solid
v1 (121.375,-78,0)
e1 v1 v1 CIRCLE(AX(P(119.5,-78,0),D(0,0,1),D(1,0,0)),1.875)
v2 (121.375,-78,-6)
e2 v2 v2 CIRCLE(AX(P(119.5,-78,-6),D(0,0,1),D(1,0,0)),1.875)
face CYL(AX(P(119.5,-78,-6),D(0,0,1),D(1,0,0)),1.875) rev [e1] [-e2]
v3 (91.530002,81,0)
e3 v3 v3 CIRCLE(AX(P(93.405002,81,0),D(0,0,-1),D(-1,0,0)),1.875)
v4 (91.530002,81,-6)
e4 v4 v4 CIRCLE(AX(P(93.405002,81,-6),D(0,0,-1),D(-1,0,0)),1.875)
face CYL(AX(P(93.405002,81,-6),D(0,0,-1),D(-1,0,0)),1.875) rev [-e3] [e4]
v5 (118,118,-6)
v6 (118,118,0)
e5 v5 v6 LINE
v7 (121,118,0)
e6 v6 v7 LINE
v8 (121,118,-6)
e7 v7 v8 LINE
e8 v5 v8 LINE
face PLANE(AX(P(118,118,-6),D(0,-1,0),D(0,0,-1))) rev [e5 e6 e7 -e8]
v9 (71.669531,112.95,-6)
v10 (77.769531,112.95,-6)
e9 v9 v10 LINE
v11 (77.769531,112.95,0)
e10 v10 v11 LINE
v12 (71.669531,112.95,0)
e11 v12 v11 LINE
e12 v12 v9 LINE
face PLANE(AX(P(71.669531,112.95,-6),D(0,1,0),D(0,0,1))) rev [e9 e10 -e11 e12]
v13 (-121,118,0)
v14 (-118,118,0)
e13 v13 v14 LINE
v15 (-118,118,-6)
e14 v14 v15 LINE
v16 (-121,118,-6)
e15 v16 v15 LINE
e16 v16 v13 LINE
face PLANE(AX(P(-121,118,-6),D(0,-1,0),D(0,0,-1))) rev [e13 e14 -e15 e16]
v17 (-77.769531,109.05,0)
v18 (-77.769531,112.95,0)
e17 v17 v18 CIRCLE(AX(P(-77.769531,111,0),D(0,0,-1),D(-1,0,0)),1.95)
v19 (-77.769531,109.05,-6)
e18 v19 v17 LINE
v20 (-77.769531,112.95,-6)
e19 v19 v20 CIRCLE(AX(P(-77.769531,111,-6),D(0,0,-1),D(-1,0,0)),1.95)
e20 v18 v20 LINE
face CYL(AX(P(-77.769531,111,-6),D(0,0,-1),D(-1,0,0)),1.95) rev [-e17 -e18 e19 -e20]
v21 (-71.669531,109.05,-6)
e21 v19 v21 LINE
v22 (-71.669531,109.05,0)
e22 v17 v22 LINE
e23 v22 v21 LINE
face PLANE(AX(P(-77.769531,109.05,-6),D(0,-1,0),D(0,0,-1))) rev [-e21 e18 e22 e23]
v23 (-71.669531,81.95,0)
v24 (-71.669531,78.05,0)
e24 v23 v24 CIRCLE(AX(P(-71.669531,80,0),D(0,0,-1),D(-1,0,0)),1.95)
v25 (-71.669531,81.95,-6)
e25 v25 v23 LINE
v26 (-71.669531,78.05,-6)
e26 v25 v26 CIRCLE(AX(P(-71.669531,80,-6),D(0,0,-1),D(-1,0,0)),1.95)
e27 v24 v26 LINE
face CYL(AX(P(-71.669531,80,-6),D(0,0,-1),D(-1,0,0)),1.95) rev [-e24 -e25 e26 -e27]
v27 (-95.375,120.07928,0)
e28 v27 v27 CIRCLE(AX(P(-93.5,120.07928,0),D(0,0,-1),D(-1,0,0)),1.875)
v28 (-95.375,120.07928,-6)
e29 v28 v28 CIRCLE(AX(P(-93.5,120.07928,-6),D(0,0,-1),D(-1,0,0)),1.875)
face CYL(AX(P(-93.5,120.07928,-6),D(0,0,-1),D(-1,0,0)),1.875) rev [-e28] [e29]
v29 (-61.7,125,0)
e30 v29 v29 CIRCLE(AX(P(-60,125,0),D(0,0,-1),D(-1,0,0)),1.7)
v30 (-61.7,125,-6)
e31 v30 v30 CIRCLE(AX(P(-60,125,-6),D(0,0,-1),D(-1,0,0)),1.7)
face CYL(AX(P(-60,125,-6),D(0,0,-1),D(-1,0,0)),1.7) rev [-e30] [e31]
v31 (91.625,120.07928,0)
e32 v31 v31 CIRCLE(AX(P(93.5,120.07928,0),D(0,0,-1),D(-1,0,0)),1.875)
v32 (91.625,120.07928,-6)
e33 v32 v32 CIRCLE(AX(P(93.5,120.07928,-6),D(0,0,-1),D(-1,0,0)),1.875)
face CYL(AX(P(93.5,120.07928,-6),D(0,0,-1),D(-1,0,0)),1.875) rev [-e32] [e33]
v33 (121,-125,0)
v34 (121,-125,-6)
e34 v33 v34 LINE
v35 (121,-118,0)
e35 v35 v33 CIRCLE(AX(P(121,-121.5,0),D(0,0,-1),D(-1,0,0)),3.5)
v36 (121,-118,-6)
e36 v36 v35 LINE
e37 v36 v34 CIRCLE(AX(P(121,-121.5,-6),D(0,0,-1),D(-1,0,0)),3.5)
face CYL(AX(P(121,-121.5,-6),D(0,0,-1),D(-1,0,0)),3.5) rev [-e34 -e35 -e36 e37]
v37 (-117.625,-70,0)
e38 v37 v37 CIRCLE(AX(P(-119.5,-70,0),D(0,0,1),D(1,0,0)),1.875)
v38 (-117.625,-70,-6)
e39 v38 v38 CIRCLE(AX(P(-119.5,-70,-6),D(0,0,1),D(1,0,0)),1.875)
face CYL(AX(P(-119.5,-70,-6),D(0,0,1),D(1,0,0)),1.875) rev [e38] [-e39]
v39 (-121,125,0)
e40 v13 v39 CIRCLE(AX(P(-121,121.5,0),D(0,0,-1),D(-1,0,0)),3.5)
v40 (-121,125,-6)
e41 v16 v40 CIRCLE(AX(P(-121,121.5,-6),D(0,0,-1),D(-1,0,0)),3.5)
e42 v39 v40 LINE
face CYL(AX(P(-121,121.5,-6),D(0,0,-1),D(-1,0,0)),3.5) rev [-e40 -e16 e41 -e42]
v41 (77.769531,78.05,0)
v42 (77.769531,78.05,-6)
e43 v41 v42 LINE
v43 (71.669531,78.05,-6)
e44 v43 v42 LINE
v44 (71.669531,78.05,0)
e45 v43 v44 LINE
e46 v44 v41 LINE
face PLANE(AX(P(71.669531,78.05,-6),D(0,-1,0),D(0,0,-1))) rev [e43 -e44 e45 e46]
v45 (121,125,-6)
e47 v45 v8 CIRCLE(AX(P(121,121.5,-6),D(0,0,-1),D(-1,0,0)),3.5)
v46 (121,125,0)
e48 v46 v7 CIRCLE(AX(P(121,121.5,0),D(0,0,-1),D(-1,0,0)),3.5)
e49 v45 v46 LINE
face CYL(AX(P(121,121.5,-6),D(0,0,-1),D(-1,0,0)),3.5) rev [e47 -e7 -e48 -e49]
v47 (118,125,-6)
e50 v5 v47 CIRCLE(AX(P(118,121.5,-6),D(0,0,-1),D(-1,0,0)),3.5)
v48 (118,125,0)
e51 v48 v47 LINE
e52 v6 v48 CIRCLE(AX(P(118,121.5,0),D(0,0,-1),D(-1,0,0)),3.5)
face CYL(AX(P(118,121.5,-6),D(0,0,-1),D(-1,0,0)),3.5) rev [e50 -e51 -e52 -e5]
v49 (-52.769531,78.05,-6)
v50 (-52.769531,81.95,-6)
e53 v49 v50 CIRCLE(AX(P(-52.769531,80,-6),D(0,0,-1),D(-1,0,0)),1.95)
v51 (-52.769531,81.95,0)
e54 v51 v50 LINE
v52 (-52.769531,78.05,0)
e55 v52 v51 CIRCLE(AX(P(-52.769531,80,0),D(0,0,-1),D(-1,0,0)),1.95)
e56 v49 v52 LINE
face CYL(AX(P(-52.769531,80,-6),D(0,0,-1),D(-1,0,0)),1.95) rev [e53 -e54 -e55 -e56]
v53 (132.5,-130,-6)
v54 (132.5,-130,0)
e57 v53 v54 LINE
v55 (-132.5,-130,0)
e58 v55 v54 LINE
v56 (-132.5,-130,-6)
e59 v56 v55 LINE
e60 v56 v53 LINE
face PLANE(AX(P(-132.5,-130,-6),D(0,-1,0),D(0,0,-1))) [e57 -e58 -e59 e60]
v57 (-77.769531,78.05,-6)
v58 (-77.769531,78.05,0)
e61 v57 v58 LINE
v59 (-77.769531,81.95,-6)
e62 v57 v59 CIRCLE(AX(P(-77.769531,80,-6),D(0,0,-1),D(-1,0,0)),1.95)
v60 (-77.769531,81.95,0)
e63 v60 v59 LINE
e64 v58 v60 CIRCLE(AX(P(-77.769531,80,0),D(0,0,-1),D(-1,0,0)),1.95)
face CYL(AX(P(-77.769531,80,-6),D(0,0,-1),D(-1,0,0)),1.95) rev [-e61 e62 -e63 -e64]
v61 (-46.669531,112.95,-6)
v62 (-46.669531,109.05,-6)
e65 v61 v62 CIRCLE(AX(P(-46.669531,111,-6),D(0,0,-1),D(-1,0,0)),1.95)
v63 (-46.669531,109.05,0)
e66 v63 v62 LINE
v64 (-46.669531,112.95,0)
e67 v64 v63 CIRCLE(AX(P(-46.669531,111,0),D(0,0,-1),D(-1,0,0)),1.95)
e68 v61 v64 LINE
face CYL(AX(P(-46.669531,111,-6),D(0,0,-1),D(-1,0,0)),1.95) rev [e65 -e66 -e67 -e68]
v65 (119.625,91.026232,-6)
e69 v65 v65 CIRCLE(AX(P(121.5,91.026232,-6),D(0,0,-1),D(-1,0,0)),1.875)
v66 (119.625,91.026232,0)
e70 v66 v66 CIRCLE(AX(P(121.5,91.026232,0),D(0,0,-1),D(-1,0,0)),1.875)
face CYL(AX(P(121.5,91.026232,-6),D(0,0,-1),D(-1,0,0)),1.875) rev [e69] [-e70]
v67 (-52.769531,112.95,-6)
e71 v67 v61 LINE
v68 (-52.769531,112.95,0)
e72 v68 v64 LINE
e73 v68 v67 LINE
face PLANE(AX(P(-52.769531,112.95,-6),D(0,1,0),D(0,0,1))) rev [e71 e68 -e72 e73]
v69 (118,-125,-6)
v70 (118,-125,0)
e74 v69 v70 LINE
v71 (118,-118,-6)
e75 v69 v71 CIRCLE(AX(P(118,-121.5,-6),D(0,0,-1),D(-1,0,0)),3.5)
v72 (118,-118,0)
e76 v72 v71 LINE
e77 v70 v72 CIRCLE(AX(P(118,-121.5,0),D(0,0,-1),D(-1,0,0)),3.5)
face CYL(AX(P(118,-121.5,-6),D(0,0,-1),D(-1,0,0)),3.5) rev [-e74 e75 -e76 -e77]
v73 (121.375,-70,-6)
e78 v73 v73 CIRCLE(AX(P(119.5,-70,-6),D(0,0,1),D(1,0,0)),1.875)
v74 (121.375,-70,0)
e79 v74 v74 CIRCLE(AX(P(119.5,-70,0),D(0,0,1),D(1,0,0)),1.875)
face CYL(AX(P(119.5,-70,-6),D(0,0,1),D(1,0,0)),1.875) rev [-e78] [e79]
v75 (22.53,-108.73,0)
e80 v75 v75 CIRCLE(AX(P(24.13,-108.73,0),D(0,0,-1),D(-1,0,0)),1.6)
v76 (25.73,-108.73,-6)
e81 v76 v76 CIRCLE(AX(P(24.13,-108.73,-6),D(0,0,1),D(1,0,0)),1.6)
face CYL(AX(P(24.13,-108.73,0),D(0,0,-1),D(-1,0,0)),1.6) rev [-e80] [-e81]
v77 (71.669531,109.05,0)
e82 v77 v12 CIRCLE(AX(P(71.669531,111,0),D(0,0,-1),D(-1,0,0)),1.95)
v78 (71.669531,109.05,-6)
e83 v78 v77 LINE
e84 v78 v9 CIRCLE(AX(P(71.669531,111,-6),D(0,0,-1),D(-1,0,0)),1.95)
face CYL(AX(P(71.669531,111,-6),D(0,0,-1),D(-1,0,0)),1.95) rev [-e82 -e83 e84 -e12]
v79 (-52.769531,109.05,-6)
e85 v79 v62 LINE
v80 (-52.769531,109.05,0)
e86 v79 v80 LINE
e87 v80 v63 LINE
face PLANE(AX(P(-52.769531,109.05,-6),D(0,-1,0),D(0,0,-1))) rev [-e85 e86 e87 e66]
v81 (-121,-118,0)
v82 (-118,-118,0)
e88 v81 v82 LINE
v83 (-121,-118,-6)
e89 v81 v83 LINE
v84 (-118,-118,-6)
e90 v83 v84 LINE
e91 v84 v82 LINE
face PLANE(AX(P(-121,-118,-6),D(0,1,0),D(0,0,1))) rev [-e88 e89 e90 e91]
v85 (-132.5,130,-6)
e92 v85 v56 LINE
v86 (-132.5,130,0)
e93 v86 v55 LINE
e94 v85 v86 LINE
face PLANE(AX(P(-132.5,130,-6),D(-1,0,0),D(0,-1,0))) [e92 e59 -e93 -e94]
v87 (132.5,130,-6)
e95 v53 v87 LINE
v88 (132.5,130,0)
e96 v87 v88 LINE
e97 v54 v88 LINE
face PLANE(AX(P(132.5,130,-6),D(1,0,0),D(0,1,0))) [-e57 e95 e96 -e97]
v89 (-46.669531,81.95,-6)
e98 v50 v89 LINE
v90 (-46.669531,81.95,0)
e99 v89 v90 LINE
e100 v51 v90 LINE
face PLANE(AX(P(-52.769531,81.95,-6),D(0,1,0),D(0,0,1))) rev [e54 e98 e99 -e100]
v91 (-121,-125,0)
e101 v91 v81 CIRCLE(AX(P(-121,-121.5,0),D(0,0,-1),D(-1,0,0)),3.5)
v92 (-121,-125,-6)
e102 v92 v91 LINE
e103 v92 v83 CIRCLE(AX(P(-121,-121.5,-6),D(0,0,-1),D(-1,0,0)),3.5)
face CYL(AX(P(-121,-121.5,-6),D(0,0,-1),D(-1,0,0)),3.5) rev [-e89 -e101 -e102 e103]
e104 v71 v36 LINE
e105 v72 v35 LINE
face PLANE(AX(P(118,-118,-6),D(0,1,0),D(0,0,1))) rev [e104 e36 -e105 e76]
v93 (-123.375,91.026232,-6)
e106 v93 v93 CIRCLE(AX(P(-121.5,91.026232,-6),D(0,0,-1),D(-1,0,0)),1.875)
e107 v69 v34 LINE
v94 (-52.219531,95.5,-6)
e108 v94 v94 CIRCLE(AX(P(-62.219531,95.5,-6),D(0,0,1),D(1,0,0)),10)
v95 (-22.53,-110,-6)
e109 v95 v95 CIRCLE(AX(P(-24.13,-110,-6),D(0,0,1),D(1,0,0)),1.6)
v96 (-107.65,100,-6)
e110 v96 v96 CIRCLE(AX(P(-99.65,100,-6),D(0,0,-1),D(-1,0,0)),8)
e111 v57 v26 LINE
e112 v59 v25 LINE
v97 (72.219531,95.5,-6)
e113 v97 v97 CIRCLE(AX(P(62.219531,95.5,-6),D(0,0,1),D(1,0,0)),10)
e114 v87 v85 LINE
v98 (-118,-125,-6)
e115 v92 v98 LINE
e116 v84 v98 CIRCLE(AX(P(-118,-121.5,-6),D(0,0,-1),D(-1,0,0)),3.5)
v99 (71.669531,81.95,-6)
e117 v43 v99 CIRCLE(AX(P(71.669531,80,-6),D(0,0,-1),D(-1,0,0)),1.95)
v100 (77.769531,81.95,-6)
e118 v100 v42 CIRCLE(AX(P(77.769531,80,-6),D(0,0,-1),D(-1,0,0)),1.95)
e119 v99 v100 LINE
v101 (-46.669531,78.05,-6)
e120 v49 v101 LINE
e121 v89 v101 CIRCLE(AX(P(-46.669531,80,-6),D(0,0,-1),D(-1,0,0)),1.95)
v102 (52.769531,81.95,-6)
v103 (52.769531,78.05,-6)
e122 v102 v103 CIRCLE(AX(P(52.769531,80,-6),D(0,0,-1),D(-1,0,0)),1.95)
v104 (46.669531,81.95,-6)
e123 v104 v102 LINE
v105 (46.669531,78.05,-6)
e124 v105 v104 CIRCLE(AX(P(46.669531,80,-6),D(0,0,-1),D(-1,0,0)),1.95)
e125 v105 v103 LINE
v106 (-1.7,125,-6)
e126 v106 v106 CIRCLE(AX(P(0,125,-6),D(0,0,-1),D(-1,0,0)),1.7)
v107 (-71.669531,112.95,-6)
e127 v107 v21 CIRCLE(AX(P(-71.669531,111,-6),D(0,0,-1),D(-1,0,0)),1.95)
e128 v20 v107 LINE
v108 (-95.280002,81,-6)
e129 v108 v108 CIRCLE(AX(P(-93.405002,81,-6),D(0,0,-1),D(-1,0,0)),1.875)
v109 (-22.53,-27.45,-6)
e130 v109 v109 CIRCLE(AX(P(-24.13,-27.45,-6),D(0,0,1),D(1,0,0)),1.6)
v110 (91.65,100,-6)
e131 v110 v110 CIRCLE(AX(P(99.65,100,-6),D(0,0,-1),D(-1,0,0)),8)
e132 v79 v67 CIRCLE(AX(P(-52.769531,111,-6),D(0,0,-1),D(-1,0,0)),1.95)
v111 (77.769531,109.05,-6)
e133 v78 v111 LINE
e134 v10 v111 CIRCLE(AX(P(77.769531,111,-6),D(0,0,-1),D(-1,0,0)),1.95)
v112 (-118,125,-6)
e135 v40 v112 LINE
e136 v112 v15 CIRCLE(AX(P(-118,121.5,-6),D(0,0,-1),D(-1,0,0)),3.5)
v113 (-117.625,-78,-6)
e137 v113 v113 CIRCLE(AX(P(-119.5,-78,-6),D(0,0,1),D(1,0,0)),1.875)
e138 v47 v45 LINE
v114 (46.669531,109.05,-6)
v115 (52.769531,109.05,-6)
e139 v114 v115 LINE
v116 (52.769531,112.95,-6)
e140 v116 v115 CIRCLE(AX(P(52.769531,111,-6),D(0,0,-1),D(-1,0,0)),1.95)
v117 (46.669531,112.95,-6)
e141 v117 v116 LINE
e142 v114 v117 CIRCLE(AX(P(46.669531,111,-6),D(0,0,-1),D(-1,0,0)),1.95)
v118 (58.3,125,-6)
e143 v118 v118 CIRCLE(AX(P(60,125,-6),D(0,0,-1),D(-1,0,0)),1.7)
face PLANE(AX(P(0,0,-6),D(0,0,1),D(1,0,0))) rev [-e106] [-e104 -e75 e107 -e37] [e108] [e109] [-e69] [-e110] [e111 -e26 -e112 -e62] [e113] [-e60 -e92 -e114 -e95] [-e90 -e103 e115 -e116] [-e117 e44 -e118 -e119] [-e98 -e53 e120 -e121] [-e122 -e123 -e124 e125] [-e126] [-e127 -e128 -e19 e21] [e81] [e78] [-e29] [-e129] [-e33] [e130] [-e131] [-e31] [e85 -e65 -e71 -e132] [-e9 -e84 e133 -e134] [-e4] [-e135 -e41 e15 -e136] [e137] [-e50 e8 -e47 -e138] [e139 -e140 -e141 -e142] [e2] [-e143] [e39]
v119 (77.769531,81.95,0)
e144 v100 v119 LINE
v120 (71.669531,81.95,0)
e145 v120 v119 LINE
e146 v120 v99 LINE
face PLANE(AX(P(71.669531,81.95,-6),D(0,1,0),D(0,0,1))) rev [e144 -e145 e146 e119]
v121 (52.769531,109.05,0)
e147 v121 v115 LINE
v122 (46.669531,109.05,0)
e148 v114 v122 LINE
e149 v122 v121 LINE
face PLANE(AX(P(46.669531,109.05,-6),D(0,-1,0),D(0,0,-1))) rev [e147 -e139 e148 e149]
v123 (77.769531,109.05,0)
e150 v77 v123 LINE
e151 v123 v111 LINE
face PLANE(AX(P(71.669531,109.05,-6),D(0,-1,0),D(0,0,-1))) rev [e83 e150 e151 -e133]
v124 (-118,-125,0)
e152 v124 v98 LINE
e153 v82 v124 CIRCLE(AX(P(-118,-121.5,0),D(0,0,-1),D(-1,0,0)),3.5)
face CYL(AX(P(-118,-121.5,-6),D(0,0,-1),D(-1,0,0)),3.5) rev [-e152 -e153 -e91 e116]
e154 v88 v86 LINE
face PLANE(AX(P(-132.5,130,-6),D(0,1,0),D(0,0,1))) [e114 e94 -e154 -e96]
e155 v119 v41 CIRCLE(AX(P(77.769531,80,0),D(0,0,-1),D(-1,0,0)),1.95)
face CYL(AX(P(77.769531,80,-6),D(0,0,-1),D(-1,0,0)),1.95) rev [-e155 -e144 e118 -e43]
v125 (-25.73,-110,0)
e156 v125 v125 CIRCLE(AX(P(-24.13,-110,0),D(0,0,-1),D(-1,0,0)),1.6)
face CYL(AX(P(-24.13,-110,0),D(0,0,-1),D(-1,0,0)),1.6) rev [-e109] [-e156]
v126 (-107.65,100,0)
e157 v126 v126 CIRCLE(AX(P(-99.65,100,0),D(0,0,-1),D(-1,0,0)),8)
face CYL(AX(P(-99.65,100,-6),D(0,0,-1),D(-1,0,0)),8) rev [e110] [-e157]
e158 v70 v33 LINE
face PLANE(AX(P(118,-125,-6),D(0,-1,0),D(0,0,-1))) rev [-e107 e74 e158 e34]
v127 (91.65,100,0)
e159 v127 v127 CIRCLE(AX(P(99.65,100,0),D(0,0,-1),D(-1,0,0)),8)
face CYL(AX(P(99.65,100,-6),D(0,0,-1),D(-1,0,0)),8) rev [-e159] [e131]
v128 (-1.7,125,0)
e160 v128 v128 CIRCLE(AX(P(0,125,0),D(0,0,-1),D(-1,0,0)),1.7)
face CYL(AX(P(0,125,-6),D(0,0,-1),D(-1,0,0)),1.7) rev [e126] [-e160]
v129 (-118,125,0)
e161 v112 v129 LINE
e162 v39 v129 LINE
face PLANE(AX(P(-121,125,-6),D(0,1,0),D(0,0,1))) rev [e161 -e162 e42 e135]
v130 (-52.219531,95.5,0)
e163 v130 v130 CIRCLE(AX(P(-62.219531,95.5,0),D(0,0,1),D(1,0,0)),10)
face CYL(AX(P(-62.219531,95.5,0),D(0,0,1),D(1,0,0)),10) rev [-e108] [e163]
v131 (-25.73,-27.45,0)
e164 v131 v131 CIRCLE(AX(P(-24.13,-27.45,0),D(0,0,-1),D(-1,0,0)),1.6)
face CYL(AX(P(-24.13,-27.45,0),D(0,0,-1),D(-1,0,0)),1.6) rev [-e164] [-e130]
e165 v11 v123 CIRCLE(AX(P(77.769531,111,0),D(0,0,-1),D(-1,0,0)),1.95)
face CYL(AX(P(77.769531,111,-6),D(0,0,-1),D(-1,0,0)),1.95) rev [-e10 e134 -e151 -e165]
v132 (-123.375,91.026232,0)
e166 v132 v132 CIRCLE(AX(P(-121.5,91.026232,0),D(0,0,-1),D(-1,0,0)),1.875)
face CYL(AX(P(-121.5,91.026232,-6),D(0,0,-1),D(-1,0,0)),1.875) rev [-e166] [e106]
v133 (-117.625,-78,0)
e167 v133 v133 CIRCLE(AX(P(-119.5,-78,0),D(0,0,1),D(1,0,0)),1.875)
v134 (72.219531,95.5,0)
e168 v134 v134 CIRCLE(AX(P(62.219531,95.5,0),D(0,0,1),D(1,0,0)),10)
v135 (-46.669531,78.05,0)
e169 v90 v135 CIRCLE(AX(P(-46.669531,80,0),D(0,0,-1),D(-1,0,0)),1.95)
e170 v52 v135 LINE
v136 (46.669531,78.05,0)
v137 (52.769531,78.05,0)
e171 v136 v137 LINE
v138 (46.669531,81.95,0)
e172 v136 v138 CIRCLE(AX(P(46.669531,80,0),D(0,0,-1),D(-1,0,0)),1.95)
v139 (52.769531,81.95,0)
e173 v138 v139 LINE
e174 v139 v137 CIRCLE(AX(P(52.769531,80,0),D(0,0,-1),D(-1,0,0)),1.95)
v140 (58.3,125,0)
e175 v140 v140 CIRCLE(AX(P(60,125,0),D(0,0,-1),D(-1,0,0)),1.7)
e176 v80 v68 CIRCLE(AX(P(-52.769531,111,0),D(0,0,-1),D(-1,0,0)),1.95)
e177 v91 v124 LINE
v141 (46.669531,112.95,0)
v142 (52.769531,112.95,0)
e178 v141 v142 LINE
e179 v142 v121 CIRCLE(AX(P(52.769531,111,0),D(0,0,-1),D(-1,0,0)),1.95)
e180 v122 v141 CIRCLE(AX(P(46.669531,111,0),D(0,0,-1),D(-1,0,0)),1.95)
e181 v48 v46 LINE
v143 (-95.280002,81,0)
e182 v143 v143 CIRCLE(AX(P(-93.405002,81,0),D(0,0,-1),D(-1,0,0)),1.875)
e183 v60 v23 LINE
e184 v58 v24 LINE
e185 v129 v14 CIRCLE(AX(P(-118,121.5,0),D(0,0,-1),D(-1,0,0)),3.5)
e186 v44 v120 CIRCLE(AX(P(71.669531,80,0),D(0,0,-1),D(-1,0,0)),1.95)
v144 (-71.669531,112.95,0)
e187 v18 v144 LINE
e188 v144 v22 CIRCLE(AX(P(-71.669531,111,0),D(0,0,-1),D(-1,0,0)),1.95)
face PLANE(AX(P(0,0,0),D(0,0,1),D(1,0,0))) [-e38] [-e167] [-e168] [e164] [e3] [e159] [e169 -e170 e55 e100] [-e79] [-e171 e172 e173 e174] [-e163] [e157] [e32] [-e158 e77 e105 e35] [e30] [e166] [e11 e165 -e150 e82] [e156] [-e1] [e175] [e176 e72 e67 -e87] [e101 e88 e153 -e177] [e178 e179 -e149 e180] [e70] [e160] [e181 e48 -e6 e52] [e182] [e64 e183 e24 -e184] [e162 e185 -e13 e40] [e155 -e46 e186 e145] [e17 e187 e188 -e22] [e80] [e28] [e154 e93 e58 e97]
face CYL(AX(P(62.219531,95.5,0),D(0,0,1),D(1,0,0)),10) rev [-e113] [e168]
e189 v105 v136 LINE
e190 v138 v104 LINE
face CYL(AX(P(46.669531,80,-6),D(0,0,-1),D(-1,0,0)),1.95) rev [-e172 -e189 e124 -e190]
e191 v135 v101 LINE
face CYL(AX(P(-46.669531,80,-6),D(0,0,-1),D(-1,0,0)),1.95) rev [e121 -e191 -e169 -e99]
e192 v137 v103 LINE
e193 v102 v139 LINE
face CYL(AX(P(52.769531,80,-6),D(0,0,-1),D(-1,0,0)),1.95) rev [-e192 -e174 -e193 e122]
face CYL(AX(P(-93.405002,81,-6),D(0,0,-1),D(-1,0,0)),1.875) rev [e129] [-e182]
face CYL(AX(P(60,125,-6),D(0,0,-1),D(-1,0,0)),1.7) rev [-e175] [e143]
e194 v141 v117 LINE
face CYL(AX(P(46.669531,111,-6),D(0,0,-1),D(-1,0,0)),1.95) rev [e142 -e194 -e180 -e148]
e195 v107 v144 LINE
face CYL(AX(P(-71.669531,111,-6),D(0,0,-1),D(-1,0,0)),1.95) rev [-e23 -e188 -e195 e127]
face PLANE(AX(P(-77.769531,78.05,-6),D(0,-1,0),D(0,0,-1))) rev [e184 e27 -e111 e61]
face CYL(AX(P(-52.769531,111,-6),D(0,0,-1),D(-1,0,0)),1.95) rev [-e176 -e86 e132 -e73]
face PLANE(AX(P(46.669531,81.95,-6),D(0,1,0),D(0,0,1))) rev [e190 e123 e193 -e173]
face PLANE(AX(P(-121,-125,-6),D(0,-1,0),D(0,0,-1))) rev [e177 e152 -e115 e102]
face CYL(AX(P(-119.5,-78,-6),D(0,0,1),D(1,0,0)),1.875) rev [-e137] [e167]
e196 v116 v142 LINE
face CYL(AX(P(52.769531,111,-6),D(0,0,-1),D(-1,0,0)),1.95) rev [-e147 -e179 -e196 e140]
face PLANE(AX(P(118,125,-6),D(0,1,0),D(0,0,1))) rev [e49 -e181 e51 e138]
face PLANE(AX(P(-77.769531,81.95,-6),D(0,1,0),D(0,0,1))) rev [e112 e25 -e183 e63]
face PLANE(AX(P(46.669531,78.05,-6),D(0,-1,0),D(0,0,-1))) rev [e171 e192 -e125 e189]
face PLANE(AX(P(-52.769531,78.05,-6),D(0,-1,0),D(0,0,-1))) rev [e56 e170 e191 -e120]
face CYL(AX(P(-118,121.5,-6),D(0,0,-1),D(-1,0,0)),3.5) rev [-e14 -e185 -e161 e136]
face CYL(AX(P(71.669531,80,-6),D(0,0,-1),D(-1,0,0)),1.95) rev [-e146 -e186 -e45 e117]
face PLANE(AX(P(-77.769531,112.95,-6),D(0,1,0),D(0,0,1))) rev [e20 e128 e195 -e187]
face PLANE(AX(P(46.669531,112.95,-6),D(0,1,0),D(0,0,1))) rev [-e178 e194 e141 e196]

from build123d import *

# Parameters (mm, degrees)
CROQUIS1_W                        = 265
CROQUIS1_H                        = 260
BRIDA_BASE1_DEPTH                 = 6
TALADRO_DE_MARGEN_PARA_M181_D     = 20
DI_METRO_DE_TALADRO_16_0_16_1_D   = 16
RANURA_START                      = -6
RANURA_DE_MARGEN_PARA_M3_54_DEPTH = 6
TALADRO_DE_MARGEN_PARA_M31_D      = 3.75
CORTAR_EXTRUIR1_DEPTH             = 186.72089274
CORTAR_EXTRUIR1_DEPTH_BACK        = 186.72089274
CROQUIS23_R                       = 1.875
CORTAR_EXTRUIR3_DEPTH             = 186.72089274
CORTAR_EXTRUIR3_DEPTH_BACK        = 186.72089274
CROQUIS29_R                       = 1.6
RANURA_DE_MARGEN_PARA_M61_DEPTH   = 6
TALADRO_DE_MARGEN_PARA_M32_D      = 3.4


# Read off the part's stored shape, not the designer's step: Ranura de margen para M3.54, Ranura de margen para M61
# Sheet-metal steps are written as plain solids
with BuildPart() as part:
    # Croquis1 → Brida base1 (new body)
    with BuildSketch(Plane.XY):
        Rectangle(CROQUIS1_W, CROQUIS1_H)
    extrude(amount=-BRIDA_BASE1_DEPTH)

    # Taladro de margen para M181 (through all)
    with Locations(Plane.XY):
        with Locations((62.219531128, 95.5), (-62.219531128, 95.5)):
            Hole(TALADRO_DE_MARGEN_PARA_M181_D / 2)

    # Diámetro de taladro Ø16.0 (16)1 (through all)
    with Locations(Plane(origin=(0, 0, -6), x_dir=(-1, 0, 0), z_dir=(0, 0, -1))):
        with Locations((-99.65, 100), (99.65, 100)):
            Hole(DI_METRO_DE_TALADRO_16_0_16_1_D / 2)

    # Ranura de margen para M3.54 outline → Ranura de margen para M3.54 (cut)
    with BuildSketch(Plane.XY.offset(RANURA_START)):
        with BuildLine():
            ThreePointArc((52.769531128, 78.05), (54.719531128, 80), (52.769531128, 81.95))
            Line((52.769531128, 81.95), (46.669531128, 81.95))
            ThreePointArc((46.669531128, 81.95), (44.719531128, 80), (46.669531128, 78.05))
            Line((46.669531128, 78.05), (52.769531128, 78.05))
        make_face()
        with BuildLine():
            ThreePointArc((71.669531128, 81.95), (69.719531128, 80), (71.669531128, 78.05))
            Line((71.669531128, 78.05), (77.769531128, 78.05))
            ThreePointArc((77.769531128, 78.05), (79.719531128, 80), (77.769531128, 81.95))
            Line((77.769531128, 81.95), (71.669531128, 81.95))
        make_face()
        with BuildLine():
            ThreePointArc((-77.769531128, 81.95), (-79.719531128, 80), (-77.769531128, 78.05))
            Line((-77.769531128, 78.05), (-71.669531128, 78.05))
            ThreePointArc((-71.669531128, 78.05), (-69.719531128, 80), (-71.669531128, 81.95))
            Line((-71.669531128, 81.95), (-77.769531128, 81.95))
        make_face()
        with BuildLine():
            ThreePointArc((-52.769531128, 81.95), (-54.719531128, 80), (-52.769531128, 78.05))
            Line((-52.769531128, 78.05), (-46.669531128, 78.05))
            ThreePointArc((-46.669531128, 78.05), (-44.719531128, 80), (-46.669531128, 81.95))
            Line((-46.669531128, 81.95), (-52.769531128, 81.95))
        make_face()
        with BuildLine():
            ThreePointArc((77.769531128, 109.05), (79.719531128, 111), (77.769531128, 112.95))
            Line((77.769531128, 112.95), (71.669531128, 112.95))
            ThreePointArc((71.669531128, 112.95), (69.719531128, 111), (71.669531128, 109.05))
            Line((71.669531128, 109.05), (77.769531128, 109.05))
        make_face()
        with BuildLine():
            ThreePointArc((46.669531128, 112.95), (44.719531128, 111), (46.669531128, 109.05))
            Line((46.669531128, 109.05), (52.769531128, 109.05))
            ThreePointArc((52.769531128, 109.05), (54.719531128, 111), (52.769531128, 112.95))
            Line((52.769531128, 112.95), (46.669531128, 112.95))
        make_face()
        with BuildLine():
            ThreePointArc((-52.769531128, 112.95), (-54.719531128, 111), (-52.769531128, 109.05))
            Line((-52.769531128, 109.05), (-46.669531128, 109.05))
            ThreePointArc((-46.669531128, 109.05), (-44.719531128, 111), (-46.669531128, 112.95))
            Line((-46.669531128, 112.95), (-52.769531128, 112.95))
        make_face()
        with BuildLine():
            ThreePointArc((-77.769531128, 112.95), (-79.719531128, 111), (-77.769531128, 109.05))
            Line((-77.769531128, 109.05), (-71.669531128, 109.05))
            ThreePointArc((-71.669531128, 109.05), (-69.719531128, 111), (-71.669531128, 112.95))
            Line((-71.669531128, 112.95), (-77.769531128, 112.95))
        make_face()
    extrude(amount=RANURA_DE_MARGEN_PARA_M3_54_DEPTH, mode=Mode.SUBTRACT)

    # Taladro de margen para M31 (through all)
    with Locations(Plane(origin=(0, 0, -6), x_dir=(-1, 0, 0), z_dir=(0, 0, -1))):
        with Locations((-93.405002002, 81), (-121.5, 91.02623214), (-93.5, 120.079280366)):
            taladro_de_margen_para_m31 = Hole(TALADRO_DE_MARGEN_PARA_M31_D / 2)

    # Simetría1: Taladro de margen para M31 across plane
    add(taladro_de_margen_para_m31.mirror(Plane(origin=(0, 0, 0), x_dir=(0, 0, 1), z_dir=(1, 0, 0))), mode=Mode.SUBTRACT)

    # Croquis23 → Cortar-Extruir1 (cut, two sides: drawn at the far end of the back side and taken through both)
    with BuildSketch(Plane.XY.offset(-CORTAR_EXTRUIR1_DEPTH_BACK)):
        with Locations((-119.5, -70)):
            Circle(CROQUIS23_R)
        with Locations((-119.5, -78)):
            Circle(CROQUIS23_R)
        with Locations((119.5, -78)):
            Circle(CROQUIS23_R)
        with Locations((119.5, -70)):
            Circle(CROQUIS23_R)
    extrude(amount=CORTAR_EXTRUIR1_DEPTH + CORTAR_EXTRUIR1_DEPTH_BACK, mode=Mode.SUBTRACT)

    # Croquis29 → Cortar-Extruir3 (cut, two sides: drawn at the far end of the back side and taken through both)
    with BuildSketch(Plane(origin=(0, 0, -6), x_dir=(-1, 0, 0), z_dir=(0, 0, -1)).offset(-CORTAR_EXTRUIR3_DEPTH_BACK)):
        with Locations((24.13, -110)):
            Circle(CROQUIS29_R)
        with Locations((-24.13, -108.73)):
            Circle(CROQUIS29_R)
        with Locations((24.13, -27.45)):
            Circle(CROQUIS29_R)
    extrude(amount=CORTAR_EXTRUIR3_DEPTH + CORTAR_EXTRUIR3_DEPTH_BACK, mode=Mode.SUBTRACT)

    # Ranura de margen para M61 outline → Ranura de margen para M61 (cut)
    with BuildSketch(Plane.XY.offset(RANURA_START)):
        with BuildLine():
            ThreePointArc((-118, 118), (-114.5, 121.5), (-118, 125))
            Line((-118, 125), (-121, 125))
            ThreePointArc((-121, 125), (-124.5, 121.5), (-121, 118))
            Line((-121, 118), (-118, 118))
        make_face()
        with BuildLine():
            ThreePointArc((118, 125), (114.5, 121.5), (118, 118))
            Line((118, 118), (121, 118))
            ThreePointArc((121, 118), (124.5, 121.5), (121, 125))
            Line((121, 125), (118, 125))
        make_face()
        with BuildLine():
            ThreePointArc((121, -125), (124.5, -121.5), (121, -118))
            Line((121, -118), (118, -118))
            ThreePointArc((118, -118), (114.5, -121.5), (118, -125))
            Line((118, -125), (121, -125))
        make_face()
        with BuildLine():
            ThreePointArc((-121, -118), (-124.5, -121.5), (-121, -125))
            Line((-121, -125), (-118, -125))
            ThreePointArc((-118, -125), (-114.5, -121.5), (-118, -118))
            Line((-118, -118), (-121, -118))
        make_face()
    extrude(amount=RANURA_DE_MARGEN_PARA_M61_DEPTH, mode=Mode.SUBTRACT)

    # Taladro de margen para M32 (through all)
    with Locations(Plane(origin=(0, 0, -6), x_dir=(-1, 0, 0), z_dir=(0, 0, -1))):
        with Locations((60, 125), (0, 125), (-60, 125)):
            Hole(TALADRO_DE_MARGEN_PARA_M32_D / 2)


solid = part.part
